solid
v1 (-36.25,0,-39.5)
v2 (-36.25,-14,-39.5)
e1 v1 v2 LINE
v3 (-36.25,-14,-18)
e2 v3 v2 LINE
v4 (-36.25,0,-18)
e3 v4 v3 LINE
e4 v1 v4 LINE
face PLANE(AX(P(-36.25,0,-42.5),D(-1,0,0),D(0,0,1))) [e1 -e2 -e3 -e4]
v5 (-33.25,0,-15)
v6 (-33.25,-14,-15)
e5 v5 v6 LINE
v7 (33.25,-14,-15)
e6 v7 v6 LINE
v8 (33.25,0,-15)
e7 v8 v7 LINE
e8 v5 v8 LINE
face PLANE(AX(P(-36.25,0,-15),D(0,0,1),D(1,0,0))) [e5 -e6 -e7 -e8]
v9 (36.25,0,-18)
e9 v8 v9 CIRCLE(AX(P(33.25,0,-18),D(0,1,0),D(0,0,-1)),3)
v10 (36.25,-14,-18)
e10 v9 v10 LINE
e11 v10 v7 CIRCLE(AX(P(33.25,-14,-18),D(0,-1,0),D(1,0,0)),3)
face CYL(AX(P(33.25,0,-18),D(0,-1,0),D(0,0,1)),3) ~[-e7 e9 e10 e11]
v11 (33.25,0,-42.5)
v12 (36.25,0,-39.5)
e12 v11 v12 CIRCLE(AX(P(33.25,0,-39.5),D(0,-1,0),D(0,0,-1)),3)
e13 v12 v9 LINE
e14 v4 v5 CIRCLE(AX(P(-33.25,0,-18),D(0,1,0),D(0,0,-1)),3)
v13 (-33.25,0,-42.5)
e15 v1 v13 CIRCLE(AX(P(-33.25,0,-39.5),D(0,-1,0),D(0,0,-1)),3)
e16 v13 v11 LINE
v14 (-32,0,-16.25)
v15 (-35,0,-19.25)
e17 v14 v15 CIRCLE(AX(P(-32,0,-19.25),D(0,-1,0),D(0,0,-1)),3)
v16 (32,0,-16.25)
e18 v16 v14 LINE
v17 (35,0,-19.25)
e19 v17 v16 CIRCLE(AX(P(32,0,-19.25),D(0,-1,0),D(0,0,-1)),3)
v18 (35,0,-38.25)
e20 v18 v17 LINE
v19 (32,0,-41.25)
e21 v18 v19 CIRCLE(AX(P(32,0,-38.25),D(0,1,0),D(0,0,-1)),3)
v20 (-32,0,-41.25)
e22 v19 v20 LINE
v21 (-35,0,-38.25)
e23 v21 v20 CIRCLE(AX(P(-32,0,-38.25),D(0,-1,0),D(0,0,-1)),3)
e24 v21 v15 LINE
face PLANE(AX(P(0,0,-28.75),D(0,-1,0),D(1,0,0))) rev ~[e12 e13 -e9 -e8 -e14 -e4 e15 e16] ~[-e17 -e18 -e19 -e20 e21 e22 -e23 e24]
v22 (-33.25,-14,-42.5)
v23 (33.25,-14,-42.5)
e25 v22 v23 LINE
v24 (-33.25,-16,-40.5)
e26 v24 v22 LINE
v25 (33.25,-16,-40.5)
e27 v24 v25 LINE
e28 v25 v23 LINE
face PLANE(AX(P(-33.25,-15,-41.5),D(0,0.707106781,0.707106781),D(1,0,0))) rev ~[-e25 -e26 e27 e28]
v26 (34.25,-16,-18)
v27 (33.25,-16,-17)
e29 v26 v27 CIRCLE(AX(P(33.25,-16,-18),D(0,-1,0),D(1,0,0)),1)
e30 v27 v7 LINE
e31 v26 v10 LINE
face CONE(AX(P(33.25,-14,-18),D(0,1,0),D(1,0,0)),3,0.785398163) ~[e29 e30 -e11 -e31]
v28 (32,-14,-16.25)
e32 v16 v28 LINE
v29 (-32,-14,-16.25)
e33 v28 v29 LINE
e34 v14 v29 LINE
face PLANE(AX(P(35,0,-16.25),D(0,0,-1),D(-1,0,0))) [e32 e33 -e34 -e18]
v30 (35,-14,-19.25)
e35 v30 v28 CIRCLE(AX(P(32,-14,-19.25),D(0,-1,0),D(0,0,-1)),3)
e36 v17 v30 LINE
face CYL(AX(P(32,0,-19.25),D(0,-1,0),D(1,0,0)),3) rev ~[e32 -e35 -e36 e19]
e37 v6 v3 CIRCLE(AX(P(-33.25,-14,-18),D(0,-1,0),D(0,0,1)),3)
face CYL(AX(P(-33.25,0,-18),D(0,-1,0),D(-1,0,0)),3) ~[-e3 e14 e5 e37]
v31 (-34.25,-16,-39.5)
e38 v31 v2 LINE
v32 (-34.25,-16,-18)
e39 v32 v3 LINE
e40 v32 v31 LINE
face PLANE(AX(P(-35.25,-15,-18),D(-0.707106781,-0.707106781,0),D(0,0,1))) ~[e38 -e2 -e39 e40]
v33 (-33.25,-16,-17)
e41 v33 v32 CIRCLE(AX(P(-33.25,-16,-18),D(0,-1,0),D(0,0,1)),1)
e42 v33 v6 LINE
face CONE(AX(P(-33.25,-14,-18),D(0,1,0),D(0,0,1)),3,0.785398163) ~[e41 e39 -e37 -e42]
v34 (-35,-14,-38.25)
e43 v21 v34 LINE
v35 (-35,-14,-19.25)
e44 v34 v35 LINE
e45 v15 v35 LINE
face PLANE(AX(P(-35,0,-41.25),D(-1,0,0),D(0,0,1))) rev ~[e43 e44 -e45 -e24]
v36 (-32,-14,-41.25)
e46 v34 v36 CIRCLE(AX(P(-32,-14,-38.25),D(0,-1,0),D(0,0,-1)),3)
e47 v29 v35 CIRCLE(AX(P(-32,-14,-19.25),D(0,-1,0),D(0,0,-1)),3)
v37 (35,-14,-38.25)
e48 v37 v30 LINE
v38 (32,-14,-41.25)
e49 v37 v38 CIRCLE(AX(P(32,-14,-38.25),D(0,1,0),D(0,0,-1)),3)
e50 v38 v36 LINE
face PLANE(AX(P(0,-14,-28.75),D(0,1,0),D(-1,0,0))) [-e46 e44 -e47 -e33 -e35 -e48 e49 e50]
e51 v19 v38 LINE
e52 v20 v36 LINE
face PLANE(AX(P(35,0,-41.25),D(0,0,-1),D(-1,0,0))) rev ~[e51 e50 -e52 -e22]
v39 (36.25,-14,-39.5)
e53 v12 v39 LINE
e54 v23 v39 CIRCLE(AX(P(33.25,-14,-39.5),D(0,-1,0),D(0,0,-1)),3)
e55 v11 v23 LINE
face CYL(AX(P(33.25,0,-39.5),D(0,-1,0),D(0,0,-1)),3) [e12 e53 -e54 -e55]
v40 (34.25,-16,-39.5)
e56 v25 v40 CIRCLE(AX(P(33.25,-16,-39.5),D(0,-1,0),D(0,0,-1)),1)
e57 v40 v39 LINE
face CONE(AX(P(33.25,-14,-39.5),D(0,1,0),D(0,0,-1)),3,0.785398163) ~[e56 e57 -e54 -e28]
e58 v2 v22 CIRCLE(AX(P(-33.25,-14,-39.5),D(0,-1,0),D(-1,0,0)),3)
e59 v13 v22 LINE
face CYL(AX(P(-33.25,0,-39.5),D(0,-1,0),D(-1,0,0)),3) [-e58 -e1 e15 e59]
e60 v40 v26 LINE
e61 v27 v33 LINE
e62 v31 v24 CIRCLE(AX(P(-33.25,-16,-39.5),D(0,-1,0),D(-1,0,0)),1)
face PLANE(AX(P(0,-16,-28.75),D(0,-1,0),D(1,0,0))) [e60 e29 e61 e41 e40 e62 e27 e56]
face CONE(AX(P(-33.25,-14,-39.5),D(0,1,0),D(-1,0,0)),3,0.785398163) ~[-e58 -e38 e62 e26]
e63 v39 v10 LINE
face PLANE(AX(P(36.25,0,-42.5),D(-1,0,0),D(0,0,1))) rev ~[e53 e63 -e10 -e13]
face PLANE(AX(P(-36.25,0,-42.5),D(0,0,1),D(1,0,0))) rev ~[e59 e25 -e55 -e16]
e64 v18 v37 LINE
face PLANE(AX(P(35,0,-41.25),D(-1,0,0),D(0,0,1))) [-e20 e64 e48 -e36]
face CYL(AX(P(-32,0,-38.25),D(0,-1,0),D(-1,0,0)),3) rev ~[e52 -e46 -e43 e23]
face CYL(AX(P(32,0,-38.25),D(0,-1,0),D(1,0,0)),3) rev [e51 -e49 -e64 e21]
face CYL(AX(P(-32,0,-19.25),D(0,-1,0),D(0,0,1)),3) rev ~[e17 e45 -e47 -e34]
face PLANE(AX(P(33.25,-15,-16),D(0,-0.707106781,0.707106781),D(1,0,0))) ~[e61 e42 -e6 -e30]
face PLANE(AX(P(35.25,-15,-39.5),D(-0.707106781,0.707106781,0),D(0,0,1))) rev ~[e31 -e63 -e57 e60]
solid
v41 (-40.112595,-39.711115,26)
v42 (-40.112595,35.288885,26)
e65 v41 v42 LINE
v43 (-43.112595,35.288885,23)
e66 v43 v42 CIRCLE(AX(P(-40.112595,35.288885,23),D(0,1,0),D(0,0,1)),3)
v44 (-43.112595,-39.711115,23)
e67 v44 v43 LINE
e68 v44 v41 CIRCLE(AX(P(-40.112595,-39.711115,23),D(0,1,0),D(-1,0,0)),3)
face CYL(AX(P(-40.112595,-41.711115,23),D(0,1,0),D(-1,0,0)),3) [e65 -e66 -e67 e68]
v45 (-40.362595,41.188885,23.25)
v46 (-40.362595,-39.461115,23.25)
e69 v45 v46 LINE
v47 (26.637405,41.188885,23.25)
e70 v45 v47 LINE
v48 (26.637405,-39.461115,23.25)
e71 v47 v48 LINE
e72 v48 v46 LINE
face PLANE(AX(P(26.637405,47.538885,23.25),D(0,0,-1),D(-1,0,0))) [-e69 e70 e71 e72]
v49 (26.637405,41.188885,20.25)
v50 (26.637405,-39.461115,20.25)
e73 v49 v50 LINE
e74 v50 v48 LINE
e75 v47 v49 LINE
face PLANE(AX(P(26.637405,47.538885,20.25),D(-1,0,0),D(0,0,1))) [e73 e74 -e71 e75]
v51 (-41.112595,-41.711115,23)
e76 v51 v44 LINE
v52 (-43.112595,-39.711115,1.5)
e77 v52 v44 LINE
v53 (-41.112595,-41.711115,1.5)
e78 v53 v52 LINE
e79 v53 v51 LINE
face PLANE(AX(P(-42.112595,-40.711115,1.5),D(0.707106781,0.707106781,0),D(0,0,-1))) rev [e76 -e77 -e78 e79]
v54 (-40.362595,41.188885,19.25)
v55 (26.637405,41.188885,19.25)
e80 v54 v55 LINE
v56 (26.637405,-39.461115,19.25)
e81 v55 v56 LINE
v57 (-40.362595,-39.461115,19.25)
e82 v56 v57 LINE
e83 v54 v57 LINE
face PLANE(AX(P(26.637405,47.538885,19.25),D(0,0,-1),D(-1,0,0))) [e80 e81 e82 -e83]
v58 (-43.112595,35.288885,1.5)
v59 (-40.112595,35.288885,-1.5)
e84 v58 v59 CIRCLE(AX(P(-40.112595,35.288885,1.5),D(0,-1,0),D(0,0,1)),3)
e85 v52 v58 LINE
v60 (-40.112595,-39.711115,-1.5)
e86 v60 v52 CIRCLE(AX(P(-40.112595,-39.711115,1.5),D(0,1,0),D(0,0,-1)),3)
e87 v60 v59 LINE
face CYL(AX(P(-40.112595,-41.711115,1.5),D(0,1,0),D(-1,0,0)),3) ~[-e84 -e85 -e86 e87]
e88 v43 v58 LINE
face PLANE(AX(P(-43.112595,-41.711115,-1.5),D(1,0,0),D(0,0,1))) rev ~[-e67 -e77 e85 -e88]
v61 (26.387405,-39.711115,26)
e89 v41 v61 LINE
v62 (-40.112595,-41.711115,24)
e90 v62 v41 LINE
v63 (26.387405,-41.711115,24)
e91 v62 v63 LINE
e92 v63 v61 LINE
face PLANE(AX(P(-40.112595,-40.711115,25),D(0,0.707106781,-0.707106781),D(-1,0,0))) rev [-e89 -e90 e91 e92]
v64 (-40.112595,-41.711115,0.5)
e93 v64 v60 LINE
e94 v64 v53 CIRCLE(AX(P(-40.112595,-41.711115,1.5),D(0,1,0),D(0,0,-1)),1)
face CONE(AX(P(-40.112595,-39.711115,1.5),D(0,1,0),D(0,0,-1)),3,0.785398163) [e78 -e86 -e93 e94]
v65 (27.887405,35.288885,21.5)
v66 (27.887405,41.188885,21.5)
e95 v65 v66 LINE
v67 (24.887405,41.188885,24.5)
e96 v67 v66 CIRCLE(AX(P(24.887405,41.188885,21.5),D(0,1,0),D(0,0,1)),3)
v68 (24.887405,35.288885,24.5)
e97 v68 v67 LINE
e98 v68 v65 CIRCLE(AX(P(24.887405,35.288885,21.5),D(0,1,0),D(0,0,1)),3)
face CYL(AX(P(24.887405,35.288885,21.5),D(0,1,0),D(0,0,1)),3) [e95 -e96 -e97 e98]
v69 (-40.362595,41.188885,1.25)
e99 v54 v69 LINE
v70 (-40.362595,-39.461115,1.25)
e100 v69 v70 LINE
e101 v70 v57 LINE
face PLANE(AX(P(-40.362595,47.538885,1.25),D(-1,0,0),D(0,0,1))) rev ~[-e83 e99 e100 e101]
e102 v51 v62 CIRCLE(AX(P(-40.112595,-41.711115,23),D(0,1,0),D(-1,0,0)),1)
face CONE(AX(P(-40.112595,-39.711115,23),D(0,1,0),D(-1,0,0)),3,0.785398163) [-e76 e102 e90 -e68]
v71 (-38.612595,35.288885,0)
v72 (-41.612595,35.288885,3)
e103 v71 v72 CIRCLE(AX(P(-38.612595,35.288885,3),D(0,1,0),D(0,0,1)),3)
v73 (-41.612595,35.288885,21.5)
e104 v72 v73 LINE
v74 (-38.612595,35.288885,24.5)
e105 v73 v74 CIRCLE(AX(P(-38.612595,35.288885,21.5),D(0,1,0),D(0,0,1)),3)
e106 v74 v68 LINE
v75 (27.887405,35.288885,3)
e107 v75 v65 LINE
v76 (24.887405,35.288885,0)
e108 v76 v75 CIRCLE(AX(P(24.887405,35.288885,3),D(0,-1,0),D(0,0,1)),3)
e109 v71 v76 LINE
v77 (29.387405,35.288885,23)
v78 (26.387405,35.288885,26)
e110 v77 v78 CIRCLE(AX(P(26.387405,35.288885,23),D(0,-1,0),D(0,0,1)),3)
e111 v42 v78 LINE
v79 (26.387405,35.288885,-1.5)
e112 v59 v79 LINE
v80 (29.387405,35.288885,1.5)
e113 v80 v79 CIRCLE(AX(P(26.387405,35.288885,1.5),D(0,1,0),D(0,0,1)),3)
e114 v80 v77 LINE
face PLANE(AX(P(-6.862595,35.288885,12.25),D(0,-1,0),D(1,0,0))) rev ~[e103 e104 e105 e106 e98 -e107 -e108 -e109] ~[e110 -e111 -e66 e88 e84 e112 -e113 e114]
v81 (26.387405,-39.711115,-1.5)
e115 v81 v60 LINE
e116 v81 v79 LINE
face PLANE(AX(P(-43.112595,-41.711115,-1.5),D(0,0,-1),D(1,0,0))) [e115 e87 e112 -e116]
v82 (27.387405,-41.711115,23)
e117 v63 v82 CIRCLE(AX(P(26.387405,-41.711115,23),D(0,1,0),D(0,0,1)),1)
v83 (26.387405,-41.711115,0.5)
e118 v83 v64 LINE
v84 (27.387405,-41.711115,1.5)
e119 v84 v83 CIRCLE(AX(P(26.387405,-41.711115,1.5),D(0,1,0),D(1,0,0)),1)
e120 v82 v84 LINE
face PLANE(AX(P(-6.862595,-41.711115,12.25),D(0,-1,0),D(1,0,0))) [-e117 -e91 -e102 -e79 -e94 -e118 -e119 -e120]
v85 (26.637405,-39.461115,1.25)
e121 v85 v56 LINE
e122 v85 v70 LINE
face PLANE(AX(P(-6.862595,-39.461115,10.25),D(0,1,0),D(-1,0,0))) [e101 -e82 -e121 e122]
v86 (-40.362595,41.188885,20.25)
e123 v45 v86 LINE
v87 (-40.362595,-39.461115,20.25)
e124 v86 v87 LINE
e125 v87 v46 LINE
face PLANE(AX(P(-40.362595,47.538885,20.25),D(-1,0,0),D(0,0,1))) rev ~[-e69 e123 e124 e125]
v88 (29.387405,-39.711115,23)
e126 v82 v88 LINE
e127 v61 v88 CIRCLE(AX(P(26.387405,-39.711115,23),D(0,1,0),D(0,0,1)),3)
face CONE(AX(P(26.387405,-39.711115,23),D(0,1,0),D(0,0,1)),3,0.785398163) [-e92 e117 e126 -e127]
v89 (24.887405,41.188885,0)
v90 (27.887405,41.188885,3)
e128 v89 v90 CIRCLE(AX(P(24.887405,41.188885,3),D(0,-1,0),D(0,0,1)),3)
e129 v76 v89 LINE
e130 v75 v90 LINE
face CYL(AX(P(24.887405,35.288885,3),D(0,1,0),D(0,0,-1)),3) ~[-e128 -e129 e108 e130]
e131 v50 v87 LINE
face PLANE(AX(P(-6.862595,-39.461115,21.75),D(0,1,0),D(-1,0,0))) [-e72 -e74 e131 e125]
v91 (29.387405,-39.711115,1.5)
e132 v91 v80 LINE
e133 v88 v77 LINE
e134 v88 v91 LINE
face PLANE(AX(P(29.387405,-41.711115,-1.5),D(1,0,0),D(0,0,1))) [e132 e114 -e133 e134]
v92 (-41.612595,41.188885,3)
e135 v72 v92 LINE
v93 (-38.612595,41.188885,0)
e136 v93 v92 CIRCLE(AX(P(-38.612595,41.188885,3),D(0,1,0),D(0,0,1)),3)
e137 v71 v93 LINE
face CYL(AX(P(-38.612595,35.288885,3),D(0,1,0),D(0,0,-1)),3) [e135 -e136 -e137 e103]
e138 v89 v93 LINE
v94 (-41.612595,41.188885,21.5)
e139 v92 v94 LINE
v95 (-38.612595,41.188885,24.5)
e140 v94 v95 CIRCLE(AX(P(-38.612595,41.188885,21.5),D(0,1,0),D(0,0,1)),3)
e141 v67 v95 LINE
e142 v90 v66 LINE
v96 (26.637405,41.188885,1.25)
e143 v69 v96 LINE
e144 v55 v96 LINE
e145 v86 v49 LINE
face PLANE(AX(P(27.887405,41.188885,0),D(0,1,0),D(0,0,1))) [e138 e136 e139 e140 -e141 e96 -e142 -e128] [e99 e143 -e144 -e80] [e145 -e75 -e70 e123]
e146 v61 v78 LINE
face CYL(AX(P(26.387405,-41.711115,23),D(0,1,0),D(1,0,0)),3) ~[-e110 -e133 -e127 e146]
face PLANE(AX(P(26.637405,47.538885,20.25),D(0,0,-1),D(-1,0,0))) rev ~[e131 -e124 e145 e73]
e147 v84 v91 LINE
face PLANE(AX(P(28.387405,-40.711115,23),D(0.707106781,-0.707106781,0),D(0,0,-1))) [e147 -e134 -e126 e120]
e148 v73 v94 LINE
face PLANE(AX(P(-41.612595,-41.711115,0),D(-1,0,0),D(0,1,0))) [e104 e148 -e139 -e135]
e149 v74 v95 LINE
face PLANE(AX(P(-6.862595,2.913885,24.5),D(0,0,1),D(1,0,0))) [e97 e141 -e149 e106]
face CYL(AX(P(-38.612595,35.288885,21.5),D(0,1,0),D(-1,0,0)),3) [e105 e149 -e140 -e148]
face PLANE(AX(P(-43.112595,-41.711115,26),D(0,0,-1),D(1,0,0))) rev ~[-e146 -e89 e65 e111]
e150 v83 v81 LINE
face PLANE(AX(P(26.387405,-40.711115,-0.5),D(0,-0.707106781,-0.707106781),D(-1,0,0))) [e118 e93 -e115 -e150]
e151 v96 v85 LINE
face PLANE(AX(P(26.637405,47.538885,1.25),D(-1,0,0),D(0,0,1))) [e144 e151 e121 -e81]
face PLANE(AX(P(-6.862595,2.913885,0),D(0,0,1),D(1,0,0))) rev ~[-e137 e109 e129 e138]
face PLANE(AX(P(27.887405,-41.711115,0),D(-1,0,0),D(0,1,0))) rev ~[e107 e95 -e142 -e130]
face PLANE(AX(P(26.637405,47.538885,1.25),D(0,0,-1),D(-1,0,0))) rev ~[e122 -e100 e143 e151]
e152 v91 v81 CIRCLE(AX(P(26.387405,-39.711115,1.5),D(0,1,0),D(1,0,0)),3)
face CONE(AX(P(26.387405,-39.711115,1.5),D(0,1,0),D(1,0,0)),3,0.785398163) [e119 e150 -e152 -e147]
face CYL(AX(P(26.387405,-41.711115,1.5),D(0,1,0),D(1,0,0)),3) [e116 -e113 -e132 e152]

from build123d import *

# Parameters (mm, degrees)
F0_W       = 69.5
F0_H       = 89.25
F1_DEPTH   = 24.5
F2_W       = 67
F2_H       = 18
F3_DEPTH   = 87
F4_W       = 67
F4_H       = 3
F5_DEPTH   = 87
F6_W       = 72.5
F6_H       = 27.5
F6_W_2     = 69.5
F6_H_2     = 24.5
F7_DEPTH   = 77
F8_W       = 6.35
F8_H       = 24.5
F1_FACE3_W = 12.25
F1_FACE3_H = 24.5
F9_DEPTH   = 70
F10_W      = 72.5
F10_H      = 27.5
F11_DEPTH  = 16
F12_W      = 70
F12_H      = 25
F13_DEPTH  = 14
F14_R      = 3
F15_SIZE   = 2
F16_R      = 3
F17_SIZE   = 2
F18_R      = 3
F19_R      = 3


# Not quite as in the source:
# - a feature names something its author has since deleted; it is built from what else it names


with BuildPart() as f1:
    # F0 (on Top) → F1 (new body)
    with BuildSketch(Plane.XY):
        with Locations((-6.8625951707, 2.9138845081)):
            Rectangle(F0_W, F0_H)
    extrude(amount=F1_DEPTH)

    # F2 (on face) → F3 (cut)
    with BuildSketch(Plane(origin=(0, 47.5388845081, 0), x_dir=(-1, 0, 0), z_dir=(0, 1, 0))):
        with Locations((6.8625951707, 10.25)):
            Rectangle(F2_W, F2_H)
    extrude(amount=-F3_DEPTH, mode=Mode.SUBTRACT)

    # F4 (on face) → F5 (cut)
    with BuildSketch(Plane(origin=(0, 47.5388845081, 0), x_dir=(-1, 0, 0), z_dir=(0, 1, 0))):
        with Locations((6.8625951707, 21.75)):
            Rectangle(F4_W, F4_H)
    extrude(amount=-F5_DEPTH, mode=Mode.SUBTRACT)

    # F6 (on face) → F7 (join)
    with BuildSketch(Plane.XZ.offset(41.7111154919)):
        with Locations((-6.8625951707, 12.25)):
            Rectangle(F6_W, F6_H)
        with Locations((-6.8625951707, 12.25)):
            Rectangle(F6_W_2, F6_H_2, mode=Mode.SUBTRACT)
    extrude(amount=-F7_DEPTH)

    # F8 (on face) + F1_face3 (on face) → F9 (cut)
    with BuildSketch(Plane.YZ.offset(27.8874048293)):
        with Locations((44.3638845081, 12.25)):
            Rectangle(F8_W, F8_H)
    with BuildSketch(Plane(origin=(-41.6125951707, 41.4138845081, 12.25), x_dir=(0, -1, 0), z_dir=(-1, 0, 0))):
        Rectangle(F1_FACE3_W, F1_FACE3_H)
    extrude(amount=-F9_DEPTH, dir=(1, 0, 0), mode=Mode.SUBTRACT)

    # F16
    f16_edges = [f1.edges().sort_by_distance(p)[0] for p in [
        (29.387405, -3.211115, -1.5),
        (29.387405, -3.211115, 26),
        (-43.112595, -3.211115, -1.5),
        (-43.112595, -3.211115, 26),
    ]]
    fillet(f16_edges, radius=F16_R)

    # F17
    f17_edges = [f1.edges().sort_by_distance(p)[0] for p in [
        (-6.862595, -41.711115, 26),
        (28.508725, -41.711115, 25.12132),
        (-42.233916, -41.711115, 25.12132),
        (29.387405, -41.711115, 12.25),
        (-43.112595, -41.711115, 12.25),
        (28.508725, -41.711115, -0.62132),
        (-42.233916, -41.711115, -0.62132),
        (-6.862595, -41.711115, -1.5),
    ]]
    chamfer(f17_edges, length=F17_SIZE)

    # F18
    f18_edges = [f1.edges().sort_by_distance(p)[0] for p in [
        (-41.612595, 38.238885, 24.5),
        (27.887405, 38.238885, 24.5),
        (-41.612595, 38.238885, 0),
        (27.887405, 38.238885, 0),
    ]]
    fillet(f18_edges, radius=F18_R)


with BuildPart() as f11:
    # F10 (on Front) → F11 (new body)
    with BuildSketch(Plane.XZ):
        with Locations((0, -28.75)):
            Rectangle(F10_W, F10_H)
    extrude(amount=F11_DEPTH)

    # F12 (on face) → F13 (cut)
    with BuildSketch(Plane(origin=(0, 0, 0), x_dir=(-1, 0, 0), z_dir=(0, 1, 0))):
        with Locations((0, -28.75)):
            Rectangle(F12_W, F12_H)
    extrude(amount=-F13_DEPTH, mode=Mode.SUBTRACT)

    # F14
    f14_edges = [f11.edges().sort_by_distance(p)[0] for p in [
        (36.25, -8, -42.5),
        (-36.25, -8, -42.5),
        (-36.25, -8, -15),
        (36.25, -8, -15),
    ]]
    fillet(f14_edges, radius=F14_R)

    # F15
    f15_edges = [f11.edges().sort_by_distance(p)[0] for p in [
        (0, -16, -42.5),
    ]]
    chamfer(f15_edges, length=F15_SIZE)

    # F19
    f19_edges = [f11.edges().sort_by_distance(p)[0] for p in [
        (-35, -7, -16.25),
        (35, -7, -16.25),
        (-35, -7, -41.25),
        (35, -7, -41.25),
    ]]
    fillet(f19_edges, radius=F19_R)


solid = Compound([f1.part, f11.part])
